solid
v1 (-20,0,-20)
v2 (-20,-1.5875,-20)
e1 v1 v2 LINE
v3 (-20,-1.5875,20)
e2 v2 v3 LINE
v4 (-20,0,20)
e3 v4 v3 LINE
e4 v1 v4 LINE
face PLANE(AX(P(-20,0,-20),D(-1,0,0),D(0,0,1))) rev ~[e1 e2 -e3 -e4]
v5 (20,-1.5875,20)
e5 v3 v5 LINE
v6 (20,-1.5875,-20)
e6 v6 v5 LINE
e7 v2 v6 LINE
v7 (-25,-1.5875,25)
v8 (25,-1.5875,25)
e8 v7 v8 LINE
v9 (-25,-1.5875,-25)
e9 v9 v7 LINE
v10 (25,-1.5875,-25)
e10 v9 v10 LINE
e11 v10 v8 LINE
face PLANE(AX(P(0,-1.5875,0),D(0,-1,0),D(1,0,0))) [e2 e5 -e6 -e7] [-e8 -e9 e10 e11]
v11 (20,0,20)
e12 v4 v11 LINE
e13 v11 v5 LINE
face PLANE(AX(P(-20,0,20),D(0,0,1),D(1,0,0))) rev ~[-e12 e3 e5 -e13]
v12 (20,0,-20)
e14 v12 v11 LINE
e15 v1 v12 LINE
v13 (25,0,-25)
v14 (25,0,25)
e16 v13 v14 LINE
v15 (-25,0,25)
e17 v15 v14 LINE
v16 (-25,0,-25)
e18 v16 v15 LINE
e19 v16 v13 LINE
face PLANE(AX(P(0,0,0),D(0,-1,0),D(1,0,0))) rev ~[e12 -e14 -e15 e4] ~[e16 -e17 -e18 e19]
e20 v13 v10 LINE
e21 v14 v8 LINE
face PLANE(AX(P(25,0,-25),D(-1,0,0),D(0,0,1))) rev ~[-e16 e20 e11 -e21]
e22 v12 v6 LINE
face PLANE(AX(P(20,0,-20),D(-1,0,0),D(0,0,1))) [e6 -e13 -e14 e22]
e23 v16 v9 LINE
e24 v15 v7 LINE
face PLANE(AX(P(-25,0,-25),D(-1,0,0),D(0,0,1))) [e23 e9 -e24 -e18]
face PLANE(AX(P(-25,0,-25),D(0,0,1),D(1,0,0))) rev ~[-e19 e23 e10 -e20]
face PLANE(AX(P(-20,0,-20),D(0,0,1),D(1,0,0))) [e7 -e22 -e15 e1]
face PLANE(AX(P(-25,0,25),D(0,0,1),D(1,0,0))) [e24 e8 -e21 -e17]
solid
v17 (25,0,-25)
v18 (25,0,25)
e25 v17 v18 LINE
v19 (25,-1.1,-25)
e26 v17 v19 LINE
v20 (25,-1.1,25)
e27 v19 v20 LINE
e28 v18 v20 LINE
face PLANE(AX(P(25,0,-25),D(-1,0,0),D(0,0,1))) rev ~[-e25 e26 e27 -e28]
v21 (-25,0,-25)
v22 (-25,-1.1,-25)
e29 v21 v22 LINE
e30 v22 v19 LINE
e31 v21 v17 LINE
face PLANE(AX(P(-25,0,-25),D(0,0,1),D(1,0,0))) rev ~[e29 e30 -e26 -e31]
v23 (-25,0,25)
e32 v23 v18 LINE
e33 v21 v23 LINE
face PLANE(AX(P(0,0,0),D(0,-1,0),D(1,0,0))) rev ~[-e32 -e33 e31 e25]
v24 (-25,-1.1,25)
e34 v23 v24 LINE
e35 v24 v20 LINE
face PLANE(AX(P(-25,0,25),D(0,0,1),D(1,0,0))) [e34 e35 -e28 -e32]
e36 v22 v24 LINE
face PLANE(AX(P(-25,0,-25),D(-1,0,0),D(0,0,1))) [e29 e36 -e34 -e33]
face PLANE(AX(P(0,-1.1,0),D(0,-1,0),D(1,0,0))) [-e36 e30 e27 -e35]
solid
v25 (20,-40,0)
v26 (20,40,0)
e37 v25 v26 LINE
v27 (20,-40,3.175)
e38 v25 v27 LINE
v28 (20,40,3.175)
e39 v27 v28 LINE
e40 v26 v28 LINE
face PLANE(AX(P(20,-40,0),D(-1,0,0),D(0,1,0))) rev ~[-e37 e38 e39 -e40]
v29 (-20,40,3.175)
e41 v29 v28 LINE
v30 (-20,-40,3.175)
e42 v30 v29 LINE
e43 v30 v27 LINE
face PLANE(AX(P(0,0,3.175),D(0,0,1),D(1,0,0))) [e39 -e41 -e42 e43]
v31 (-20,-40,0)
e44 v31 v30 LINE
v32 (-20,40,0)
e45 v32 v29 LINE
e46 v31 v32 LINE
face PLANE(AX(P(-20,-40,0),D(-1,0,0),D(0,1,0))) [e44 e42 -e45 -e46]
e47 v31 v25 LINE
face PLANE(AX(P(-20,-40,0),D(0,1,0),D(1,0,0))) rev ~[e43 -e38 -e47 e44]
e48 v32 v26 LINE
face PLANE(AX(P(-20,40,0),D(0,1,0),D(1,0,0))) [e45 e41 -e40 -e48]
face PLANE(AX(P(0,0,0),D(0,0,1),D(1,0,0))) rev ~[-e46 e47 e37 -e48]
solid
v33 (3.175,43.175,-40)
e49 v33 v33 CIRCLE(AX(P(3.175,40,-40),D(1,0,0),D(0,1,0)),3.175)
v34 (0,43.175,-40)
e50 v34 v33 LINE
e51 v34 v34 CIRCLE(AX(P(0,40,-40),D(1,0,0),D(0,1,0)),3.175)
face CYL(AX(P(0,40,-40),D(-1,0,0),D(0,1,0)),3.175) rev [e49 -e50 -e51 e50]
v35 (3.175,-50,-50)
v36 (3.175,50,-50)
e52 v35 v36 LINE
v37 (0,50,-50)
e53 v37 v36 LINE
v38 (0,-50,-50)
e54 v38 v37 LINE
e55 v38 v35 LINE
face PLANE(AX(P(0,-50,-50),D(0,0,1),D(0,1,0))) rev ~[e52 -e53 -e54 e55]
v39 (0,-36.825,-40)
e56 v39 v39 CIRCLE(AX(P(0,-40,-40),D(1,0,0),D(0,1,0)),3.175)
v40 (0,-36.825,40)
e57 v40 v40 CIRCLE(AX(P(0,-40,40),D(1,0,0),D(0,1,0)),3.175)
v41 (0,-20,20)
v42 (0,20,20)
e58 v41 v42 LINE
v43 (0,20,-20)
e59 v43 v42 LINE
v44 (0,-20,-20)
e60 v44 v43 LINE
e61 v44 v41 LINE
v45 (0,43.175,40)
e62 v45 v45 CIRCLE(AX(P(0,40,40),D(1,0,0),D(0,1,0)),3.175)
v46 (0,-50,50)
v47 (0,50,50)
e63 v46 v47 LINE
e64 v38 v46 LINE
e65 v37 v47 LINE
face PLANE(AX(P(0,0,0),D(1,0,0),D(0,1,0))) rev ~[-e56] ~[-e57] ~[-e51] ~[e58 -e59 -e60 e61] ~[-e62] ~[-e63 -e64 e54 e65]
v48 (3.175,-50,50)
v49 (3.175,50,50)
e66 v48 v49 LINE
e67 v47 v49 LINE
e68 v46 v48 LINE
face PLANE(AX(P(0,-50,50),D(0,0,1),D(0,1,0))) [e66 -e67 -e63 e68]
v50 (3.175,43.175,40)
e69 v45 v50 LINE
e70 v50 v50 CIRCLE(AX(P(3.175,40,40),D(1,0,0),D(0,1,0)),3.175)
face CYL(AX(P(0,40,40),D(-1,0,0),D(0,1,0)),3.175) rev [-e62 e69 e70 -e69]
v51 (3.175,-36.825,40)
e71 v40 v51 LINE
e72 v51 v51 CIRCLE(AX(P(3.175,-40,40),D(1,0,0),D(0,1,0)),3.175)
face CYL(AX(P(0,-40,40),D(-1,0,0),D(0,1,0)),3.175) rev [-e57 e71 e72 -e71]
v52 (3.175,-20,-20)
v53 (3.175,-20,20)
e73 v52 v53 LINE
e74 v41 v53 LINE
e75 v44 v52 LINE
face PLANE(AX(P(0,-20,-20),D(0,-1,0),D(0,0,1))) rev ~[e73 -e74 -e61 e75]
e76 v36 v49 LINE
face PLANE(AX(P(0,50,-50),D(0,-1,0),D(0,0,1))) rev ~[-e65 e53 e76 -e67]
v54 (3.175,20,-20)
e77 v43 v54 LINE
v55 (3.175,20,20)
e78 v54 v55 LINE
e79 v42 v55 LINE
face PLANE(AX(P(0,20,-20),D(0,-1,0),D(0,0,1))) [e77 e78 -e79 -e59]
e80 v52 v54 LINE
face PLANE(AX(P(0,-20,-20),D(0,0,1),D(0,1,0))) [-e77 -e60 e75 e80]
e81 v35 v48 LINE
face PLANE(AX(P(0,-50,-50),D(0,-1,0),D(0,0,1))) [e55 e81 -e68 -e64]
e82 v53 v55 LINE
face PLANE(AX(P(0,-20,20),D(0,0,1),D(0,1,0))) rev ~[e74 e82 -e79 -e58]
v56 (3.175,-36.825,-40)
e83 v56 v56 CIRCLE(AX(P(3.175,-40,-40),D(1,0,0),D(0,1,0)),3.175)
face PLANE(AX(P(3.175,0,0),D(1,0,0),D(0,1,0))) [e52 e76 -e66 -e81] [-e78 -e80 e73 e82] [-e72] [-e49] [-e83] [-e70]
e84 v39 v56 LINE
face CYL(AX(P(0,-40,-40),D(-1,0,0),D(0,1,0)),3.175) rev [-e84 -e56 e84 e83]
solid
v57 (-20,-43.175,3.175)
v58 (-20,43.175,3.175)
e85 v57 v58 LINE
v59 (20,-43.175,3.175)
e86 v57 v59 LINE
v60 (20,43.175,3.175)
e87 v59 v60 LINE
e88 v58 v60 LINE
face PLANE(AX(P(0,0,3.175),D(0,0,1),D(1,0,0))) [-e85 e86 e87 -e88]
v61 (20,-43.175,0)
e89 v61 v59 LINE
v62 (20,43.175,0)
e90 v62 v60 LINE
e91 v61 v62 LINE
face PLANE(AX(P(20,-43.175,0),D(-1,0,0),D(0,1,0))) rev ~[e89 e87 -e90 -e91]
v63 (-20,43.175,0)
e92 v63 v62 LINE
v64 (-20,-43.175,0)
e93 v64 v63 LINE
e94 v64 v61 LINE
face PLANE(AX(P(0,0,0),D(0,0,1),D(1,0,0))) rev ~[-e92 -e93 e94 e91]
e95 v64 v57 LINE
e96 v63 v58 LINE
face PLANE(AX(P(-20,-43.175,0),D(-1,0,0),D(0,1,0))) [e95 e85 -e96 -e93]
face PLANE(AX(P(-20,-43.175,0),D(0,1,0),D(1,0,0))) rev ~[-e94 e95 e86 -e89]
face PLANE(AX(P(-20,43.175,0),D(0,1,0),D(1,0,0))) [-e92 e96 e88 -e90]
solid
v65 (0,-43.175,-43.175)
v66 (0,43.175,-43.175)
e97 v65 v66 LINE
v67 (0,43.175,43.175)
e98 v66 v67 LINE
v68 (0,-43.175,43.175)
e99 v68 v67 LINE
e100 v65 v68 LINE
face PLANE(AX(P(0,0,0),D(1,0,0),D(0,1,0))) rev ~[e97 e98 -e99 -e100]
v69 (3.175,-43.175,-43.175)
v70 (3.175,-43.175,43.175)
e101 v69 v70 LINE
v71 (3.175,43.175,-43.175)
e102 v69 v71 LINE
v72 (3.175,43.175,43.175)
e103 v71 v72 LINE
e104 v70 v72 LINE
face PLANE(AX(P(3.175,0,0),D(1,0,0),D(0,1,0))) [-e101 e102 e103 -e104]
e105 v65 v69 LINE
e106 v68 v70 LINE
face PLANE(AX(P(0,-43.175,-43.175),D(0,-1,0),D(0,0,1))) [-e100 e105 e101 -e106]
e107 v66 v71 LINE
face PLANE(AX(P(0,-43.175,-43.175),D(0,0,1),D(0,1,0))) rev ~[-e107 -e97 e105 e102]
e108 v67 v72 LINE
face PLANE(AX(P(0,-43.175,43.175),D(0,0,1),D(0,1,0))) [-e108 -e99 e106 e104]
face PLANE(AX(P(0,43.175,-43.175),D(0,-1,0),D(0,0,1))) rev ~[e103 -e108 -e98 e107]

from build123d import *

# Parameters (mm, degrees)
F0_W      = 50
F0_H      = 50
F0_W_2    = 40
F0_H_2    = 40
F1_DEPTH  = 1.5875
F2_W      = 100
F2_H      = 100
F2_R      = 3.175
F2_W_2    = 40
F2_H_2    = 40
F3_DEPTH  = 3.175
F4_W      = 40
F4_H      = 80
F5_DEPTH  = 3.175
F6_W      = 50
F6_H      = 50
F7_DEPTH  = 1.1
F8_W      = 40
F8_H      = 86.35
F9_DEPTH  = 3.175
F10_W     = 86.35
F10_H     = 86.35
F11_DEPTH = 3.175


# Not quite as in the source:
# - a length typed as a fraction of an inch, garbled in the dataset ("3 / 203.2 mm" for 3/8 in), is restored


with BuildPart() as f1:
    # F0 (on Front) → F1 (new body)
    with BuildSketch(Plane.XZ):
        Rectangle(F0_W, F0_H)
        Rectangle(F0_W_2, F0_H_2, mode=Mode.SUBTRACT)
    extrude(amount=F1_DEPTH)


with BuildPart() as f3:
    # F2 (on Right) → F3 (new body)
    with BuildSketch(Plane.YZ):
        Rectangle(F2_W, F2_H)
        with Locations((-40, -40)):
            Circle(F2_R, mode=Mode.SUBTRACT)
        with Locations((40, -40)):
            Circle(F2_R, mode=Mode.SUBTRACT)
        with Locations((-40, 40)):
            Circle(F2_R, mode=Mode.SUBTRACT)
        Rectangle(F2_W_2, F2_H_2, mode=Mode.SUBTRACT)
        with Locations((40, 40)):
            Circle(F2_R, mode=Mode.SUBTRACT)
    extrude(amount=F3_DEPTH)


with BuildPart() as f5:
    # F4 (on Top) → F5 (new body)
    with BuildSketch(Plane.XY):
        Rectangle(F4_W, F4_H)
    extrude(amount=F5_DEPTH)


with BuildPart() as f7:
    # F6 (on Front) → F7 (new body)
    with BuildSketch(Plane.XZ):
        Rectangle(F6_W, F6_H)
    extrude(amount=F7_DEPTH)


with BuildPart() as f9:
    # F8 (on Top) → F9 (new body)
    with BuildSketch(Plane.XY):
        Rectangle(F8_W, F8_H)
    extrude(amount=F9_DEPTH)


with BuildPart() as f11:
    # F10 (on Right) → F11 (new body)
    with BuildSketch(Plane.YZ):
        Rectangle(F10_W, F10_H)
    extrude(amount=F11_DEPTH)


solid = Compound([f1.part, f3.part, f5.part, f7.part, f9.part, f11.part])
